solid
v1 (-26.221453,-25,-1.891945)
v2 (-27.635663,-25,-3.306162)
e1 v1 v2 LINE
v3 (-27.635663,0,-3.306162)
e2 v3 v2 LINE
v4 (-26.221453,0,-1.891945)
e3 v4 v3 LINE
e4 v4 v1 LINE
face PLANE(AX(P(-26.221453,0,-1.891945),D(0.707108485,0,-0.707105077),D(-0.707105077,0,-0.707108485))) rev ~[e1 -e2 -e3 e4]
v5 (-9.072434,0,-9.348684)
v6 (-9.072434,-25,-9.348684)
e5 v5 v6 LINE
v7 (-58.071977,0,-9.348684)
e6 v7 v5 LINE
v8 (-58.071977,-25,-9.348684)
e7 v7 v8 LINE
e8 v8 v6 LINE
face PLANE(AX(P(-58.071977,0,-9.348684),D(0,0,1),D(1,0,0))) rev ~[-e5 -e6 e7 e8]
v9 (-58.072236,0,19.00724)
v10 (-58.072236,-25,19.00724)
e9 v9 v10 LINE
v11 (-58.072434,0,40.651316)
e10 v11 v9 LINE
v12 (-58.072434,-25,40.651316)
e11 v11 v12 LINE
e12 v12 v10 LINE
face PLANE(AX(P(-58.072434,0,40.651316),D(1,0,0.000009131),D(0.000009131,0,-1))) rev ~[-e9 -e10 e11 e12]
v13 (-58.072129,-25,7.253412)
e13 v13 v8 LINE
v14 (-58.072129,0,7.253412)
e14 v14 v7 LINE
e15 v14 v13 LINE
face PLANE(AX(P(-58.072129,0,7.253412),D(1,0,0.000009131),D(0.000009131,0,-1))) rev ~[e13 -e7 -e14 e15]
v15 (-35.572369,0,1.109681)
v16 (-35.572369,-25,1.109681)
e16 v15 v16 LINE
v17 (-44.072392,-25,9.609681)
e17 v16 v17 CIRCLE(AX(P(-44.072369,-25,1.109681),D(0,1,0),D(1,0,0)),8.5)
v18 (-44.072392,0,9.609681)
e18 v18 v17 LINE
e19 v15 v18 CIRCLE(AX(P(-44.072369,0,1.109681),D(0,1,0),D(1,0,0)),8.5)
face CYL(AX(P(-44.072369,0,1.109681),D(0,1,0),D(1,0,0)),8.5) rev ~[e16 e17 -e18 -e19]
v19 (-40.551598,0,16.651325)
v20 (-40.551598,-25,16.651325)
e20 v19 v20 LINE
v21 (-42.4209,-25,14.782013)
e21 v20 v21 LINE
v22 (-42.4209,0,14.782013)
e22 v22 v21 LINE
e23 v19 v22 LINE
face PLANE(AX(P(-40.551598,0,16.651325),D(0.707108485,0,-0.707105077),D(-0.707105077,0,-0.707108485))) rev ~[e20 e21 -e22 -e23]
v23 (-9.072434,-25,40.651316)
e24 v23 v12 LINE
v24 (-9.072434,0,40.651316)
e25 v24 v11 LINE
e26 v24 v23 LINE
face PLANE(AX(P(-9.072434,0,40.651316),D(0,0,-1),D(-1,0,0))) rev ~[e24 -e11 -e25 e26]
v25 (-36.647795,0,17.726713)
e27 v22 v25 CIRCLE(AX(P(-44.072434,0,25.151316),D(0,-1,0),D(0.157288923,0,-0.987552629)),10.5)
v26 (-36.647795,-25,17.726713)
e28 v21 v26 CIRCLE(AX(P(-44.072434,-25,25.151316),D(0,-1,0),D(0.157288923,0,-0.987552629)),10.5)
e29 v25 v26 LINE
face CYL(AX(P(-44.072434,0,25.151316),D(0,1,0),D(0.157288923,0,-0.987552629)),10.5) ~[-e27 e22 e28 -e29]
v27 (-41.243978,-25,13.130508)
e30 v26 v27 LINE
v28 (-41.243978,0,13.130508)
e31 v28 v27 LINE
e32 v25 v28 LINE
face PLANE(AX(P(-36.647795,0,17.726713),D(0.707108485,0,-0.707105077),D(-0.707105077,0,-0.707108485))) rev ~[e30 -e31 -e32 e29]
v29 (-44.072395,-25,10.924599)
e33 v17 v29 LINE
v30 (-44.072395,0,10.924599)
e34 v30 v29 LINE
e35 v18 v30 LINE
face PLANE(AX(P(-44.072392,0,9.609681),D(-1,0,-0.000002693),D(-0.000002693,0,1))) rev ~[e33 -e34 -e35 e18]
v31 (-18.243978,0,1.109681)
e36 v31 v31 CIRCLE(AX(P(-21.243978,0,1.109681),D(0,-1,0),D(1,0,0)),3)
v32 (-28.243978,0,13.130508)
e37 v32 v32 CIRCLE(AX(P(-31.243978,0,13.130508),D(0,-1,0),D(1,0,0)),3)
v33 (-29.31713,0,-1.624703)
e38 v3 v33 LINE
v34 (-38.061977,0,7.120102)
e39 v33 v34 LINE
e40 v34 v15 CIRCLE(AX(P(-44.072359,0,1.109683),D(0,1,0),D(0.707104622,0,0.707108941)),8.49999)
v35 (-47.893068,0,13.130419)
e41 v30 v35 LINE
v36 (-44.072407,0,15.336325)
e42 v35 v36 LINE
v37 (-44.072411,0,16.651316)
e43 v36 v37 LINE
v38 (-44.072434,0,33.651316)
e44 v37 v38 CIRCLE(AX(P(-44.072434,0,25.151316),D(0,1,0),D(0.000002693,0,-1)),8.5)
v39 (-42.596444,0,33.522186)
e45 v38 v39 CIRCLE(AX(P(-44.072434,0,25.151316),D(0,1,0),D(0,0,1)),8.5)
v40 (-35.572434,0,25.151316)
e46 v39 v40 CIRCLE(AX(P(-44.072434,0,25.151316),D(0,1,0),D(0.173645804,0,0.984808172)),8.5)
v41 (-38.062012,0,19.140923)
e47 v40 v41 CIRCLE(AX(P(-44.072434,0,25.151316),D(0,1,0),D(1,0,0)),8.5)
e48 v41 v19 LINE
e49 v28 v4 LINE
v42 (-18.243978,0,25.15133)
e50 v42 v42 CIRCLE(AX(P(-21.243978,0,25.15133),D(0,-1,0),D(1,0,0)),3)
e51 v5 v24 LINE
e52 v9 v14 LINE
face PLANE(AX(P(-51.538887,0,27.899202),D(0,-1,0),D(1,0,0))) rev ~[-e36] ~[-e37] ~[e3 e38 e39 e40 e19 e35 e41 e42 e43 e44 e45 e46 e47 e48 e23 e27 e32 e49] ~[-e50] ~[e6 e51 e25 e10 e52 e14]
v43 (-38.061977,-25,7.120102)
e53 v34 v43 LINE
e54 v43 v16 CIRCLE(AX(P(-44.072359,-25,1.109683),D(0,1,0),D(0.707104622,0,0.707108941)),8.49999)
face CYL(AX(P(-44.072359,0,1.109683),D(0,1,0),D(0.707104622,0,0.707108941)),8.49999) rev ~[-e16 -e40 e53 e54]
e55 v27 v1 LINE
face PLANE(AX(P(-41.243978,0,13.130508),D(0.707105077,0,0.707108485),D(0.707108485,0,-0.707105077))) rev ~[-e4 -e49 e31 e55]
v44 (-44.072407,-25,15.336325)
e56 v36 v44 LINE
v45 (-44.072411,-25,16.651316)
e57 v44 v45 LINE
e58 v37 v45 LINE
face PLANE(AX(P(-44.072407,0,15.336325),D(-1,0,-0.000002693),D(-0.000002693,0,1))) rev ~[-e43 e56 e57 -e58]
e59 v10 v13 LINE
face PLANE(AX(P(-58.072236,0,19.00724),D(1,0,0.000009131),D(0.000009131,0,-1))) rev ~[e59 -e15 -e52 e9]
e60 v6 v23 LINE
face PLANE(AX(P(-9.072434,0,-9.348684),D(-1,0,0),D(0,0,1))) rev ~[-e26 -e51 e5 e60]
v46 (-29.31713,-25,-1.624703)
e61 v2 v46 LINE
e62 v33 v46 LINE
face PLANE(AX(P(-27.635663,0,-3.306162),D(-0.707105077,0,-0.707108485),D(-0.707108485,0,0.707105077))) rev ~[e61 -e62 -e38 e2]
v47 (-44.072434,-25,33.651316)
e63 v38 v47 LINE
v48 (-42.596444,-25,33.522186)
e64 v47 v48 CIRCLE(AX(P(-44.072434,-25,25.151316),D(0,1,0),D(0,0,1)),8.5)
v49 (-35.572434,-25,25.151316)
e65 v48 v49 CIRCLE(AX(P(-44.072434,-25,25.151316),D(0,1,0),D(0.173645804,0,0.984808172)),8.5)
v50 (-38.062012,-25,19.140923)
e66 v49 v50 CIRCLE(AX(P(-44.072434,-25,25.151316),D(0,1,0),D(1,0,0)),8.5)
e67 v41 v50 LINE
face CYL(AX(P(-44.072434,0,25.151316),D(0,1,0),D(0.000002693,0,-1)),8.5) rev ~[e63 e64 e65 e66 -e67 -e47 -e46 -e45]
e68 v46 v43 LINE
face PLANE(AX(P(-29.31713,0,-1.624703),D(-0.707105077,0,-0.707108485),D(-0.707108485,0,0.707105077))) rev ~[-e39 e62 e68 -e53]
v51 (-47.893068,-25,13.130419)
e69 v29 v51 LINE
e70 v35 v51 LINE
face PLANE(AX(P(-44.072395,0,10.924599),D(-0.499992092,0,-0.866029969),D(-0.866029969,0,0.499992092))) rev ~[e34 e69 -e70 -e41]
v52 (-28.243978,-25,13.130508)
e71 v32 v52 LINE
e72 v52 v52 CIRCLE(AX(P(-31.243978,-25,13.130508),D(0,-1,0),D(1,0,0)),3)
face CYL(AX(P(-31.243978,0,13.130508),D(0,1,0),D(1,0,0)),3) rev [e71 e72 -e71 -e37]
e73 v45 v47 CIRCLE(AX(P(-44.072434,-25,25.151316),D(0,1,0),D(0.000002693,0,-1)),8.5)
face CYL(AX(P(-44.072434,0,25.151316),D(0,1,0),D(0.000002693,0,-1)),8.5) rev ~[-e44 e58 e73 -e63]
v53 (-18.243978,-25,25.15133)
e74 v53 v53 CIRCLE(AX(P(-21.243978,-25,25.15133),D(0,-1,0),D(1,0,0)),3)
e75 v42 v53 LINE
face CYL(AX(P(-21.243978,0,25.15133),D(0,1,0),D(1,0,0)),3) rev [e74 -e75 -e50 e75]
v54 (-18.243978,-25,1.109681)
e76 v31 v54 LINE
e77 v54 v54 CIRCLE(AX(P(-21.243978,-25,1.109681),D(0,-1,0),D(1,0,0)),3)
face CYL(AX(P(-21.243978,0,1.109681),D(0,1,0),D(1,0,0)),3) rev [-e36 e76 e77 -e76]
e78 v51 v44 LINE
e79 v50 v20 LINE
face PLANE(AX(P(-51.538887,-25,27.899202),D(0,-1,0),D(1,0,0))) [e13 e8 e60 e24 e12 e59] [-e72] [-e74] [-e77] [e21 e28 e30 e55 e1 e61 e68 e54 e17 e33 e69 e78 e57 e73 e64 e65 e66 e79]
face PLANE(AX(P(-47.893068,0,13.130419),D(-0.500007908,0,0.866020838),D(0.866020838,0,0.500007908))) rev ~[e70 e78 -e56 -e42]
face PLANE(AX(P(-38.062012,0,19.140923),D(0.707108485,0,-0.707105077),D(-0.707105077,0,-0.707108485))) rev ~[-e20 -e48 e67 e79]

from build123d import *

# Parameters (mm, degrees)
F1_DEPTH = 25
F0_R     = 3
F2_DEPTH = 25


# Not quite as in the source:
# - ends of sketch curves that miss each other by under 0.0002 mm in the source are joined


with BuildPart() as f1:
    # F0 (on Front) → F1 (new body)
    with BuildSketch(Plane.XZ):
        with BuildLine():
            ThreePointArc((-35.5724336391, 25.151316084), (-36.2194536929, 21.8985163721), (-38.0620115133, 19.1409229296))
            Line((-38.0620115133, 19.1409229296), (-40.551597873, 16.6513245695))
            Line((-40.551597873, 16.6513245695), (-42.4208999514, 14.7820134806))
            ThreePointArc((-42.4208999514, 14.7820134806), (-39.3014754977, 15.797816289), (-36.6477945425, 17.7267127756))
            ThreePointArc((-36.6477945425, 17.7267127756), (-34.0584132659, 28.3087511137), (-42.2491526952, 35.491801885))
            ThreePointArc((-42.2491526952, 35.491801885), (-43.1573109451, 35.6113615168), (-44.0724336391, 35.651316084))
            Line((-44.0724336391, 35.651316084), (-44.0724336391, 33.651316084))
            ThreePointArc((-44.0724336391, 33.651316084), (-43.3316200297, 33.6189719105), (-42.5964443036, 33.5221855419))
            ThreePointArc((-42.5964443036, 33.5221855419), (-37.5610624566, 30.6150186129), (-35.5724336391, 25.151316084))
        make_face()
    extrude(amount=F1_DEPTH)

    # F0 (on Front) → F2 (join)
    with BuildSketch(Plane.XZ):
        with BuildLine():
            Line((-44.0724072079, 15.3363250258), (-44.0724107491, 16.651316084))
            ThreePointArc((-44.0724107491, 16.651316084), (-52.5724336391, 25.151304639), (-44.0724336391, 33.651316084))
            Line((-44.0724336391, 33.651316084), (-44.0724336391, 35.651316084))
            Line((-44.0724336391, 35.651316084), (-44.0724336391, 40.651316084))
            Line((-44.0724336391, 40.651316084), (-58.0724336391, 40.651316084))
            Line((-58.0724336391, 40.651316084), (-58.0722360097, 19.007240245))
            Line((-58.0722360097, 19.007240245), (-47.893068168, 13.1304188771))
            Line((-47.893068168, 13.1304188771), (-44.0724072079, 15.3363250258))
        make_face()
        Polygon((-18.7646776515, 35.6099158673), (-36.6477945425, 17.7267127756), (-41.2439775428, 13.1305076206), (-26.2214527658, -1.8919447448), (-18.7646776515, -9.348683916), (-9.0724336391, -9.348683916), (-9.0724336391, 35.6099158673), align=None)
        with Locations((-21.2439775428, 1.1096808038)):
            Circle(F0_R, mode=Mode.SUBTRACT)
        with Locations((-31.2439775428, 13.1305076206)):
            Circle(F0_R, mode=Mode.SUBTRACT)
        with Locations((-21.2439775428, 25.1513302219)):
            Circle(F0_R, mode=Mode.SUBTRACT)
        with BuildLine():
            ThreePointArc((-42.2491526952, 35.491801885), (-34.0584132659, 28.3087511137), (-36.6477945425, 17.7267127756))
            Line((-36.6477945425, 17.7267127756), (-18.7646776515, 35.6099158673))
            Line((-18.7646776515, 35.6099158673), (-9.0724336391, 35.6099158673))
            Line((-9.0724336391, 35.6099158673), (-9.0724336391, 40.651316084))
            Line((-9.0724336391, 40.651316084), (-18.7646776515, 40.651316084))
            Line((-18.7646776515, 40.651316084), (-44.0724336391, 40.651316084))
            Line((-44.0724336391, 40.651316084), (-44.0724336391, 35.651316084))
            ThreePointArc((-44.0724336391, 35.651316084), (-43.1573109451, 35.6113615168), (-42.2491526952, 35.491801885))
        make_face()
        with BuildLine():
            Line((-44.0723953274, 10.9245988987), (-47.893068168, 13.1304188771))
            Line((-47.893068168, 13.1304188771), (-58.0721286869, 7.2534116208))
            Line((-58.0721286869, 7.2534116208), (-58.0719770953, -9.348683916))
            Line((-58.0719770953, -9.348683916), (-21.593111593, -9.348683916))
            Line((-21.593111593, -9.348683916), (-27.6356629198, -3.3061617156))
            Line((-27.6356629198, -3.3061617156), (-29.3171299504, -1.62470279))
            Line((-29.3171299504, -1.62470279), (-38.061976782, 7.1201018897))
            ThreePointArc((-38.061976782, 7.1201018897), (-36.2193967899, 4.3624994422), (-35.5723688964, 1.1096808038))
            ThreePointArc((-35.5723688964, 1.1096808038), (-50.0827684437, -4.9007349291), (-44.0723917864, 9.6096808038))
            Line((-44.0723917864, 9.6096808038), (-44.0723953274, 10.9245988987))
        make_face()
        Polygon((-58.0721286869, 7.2534116208), (-47.893068168, 13.1304188771), (-58.0722360097, 19.007240245), align=None)
        Polygon((-18.7646776515, -9.348683916), (-26.2214527658, -1.8919447448), (-27.6356629198, -3.3061617156), (-21.593111593, -9.348683916), align=None)
    extrude(amount=F2_DEPTH)


solid = f1.part
